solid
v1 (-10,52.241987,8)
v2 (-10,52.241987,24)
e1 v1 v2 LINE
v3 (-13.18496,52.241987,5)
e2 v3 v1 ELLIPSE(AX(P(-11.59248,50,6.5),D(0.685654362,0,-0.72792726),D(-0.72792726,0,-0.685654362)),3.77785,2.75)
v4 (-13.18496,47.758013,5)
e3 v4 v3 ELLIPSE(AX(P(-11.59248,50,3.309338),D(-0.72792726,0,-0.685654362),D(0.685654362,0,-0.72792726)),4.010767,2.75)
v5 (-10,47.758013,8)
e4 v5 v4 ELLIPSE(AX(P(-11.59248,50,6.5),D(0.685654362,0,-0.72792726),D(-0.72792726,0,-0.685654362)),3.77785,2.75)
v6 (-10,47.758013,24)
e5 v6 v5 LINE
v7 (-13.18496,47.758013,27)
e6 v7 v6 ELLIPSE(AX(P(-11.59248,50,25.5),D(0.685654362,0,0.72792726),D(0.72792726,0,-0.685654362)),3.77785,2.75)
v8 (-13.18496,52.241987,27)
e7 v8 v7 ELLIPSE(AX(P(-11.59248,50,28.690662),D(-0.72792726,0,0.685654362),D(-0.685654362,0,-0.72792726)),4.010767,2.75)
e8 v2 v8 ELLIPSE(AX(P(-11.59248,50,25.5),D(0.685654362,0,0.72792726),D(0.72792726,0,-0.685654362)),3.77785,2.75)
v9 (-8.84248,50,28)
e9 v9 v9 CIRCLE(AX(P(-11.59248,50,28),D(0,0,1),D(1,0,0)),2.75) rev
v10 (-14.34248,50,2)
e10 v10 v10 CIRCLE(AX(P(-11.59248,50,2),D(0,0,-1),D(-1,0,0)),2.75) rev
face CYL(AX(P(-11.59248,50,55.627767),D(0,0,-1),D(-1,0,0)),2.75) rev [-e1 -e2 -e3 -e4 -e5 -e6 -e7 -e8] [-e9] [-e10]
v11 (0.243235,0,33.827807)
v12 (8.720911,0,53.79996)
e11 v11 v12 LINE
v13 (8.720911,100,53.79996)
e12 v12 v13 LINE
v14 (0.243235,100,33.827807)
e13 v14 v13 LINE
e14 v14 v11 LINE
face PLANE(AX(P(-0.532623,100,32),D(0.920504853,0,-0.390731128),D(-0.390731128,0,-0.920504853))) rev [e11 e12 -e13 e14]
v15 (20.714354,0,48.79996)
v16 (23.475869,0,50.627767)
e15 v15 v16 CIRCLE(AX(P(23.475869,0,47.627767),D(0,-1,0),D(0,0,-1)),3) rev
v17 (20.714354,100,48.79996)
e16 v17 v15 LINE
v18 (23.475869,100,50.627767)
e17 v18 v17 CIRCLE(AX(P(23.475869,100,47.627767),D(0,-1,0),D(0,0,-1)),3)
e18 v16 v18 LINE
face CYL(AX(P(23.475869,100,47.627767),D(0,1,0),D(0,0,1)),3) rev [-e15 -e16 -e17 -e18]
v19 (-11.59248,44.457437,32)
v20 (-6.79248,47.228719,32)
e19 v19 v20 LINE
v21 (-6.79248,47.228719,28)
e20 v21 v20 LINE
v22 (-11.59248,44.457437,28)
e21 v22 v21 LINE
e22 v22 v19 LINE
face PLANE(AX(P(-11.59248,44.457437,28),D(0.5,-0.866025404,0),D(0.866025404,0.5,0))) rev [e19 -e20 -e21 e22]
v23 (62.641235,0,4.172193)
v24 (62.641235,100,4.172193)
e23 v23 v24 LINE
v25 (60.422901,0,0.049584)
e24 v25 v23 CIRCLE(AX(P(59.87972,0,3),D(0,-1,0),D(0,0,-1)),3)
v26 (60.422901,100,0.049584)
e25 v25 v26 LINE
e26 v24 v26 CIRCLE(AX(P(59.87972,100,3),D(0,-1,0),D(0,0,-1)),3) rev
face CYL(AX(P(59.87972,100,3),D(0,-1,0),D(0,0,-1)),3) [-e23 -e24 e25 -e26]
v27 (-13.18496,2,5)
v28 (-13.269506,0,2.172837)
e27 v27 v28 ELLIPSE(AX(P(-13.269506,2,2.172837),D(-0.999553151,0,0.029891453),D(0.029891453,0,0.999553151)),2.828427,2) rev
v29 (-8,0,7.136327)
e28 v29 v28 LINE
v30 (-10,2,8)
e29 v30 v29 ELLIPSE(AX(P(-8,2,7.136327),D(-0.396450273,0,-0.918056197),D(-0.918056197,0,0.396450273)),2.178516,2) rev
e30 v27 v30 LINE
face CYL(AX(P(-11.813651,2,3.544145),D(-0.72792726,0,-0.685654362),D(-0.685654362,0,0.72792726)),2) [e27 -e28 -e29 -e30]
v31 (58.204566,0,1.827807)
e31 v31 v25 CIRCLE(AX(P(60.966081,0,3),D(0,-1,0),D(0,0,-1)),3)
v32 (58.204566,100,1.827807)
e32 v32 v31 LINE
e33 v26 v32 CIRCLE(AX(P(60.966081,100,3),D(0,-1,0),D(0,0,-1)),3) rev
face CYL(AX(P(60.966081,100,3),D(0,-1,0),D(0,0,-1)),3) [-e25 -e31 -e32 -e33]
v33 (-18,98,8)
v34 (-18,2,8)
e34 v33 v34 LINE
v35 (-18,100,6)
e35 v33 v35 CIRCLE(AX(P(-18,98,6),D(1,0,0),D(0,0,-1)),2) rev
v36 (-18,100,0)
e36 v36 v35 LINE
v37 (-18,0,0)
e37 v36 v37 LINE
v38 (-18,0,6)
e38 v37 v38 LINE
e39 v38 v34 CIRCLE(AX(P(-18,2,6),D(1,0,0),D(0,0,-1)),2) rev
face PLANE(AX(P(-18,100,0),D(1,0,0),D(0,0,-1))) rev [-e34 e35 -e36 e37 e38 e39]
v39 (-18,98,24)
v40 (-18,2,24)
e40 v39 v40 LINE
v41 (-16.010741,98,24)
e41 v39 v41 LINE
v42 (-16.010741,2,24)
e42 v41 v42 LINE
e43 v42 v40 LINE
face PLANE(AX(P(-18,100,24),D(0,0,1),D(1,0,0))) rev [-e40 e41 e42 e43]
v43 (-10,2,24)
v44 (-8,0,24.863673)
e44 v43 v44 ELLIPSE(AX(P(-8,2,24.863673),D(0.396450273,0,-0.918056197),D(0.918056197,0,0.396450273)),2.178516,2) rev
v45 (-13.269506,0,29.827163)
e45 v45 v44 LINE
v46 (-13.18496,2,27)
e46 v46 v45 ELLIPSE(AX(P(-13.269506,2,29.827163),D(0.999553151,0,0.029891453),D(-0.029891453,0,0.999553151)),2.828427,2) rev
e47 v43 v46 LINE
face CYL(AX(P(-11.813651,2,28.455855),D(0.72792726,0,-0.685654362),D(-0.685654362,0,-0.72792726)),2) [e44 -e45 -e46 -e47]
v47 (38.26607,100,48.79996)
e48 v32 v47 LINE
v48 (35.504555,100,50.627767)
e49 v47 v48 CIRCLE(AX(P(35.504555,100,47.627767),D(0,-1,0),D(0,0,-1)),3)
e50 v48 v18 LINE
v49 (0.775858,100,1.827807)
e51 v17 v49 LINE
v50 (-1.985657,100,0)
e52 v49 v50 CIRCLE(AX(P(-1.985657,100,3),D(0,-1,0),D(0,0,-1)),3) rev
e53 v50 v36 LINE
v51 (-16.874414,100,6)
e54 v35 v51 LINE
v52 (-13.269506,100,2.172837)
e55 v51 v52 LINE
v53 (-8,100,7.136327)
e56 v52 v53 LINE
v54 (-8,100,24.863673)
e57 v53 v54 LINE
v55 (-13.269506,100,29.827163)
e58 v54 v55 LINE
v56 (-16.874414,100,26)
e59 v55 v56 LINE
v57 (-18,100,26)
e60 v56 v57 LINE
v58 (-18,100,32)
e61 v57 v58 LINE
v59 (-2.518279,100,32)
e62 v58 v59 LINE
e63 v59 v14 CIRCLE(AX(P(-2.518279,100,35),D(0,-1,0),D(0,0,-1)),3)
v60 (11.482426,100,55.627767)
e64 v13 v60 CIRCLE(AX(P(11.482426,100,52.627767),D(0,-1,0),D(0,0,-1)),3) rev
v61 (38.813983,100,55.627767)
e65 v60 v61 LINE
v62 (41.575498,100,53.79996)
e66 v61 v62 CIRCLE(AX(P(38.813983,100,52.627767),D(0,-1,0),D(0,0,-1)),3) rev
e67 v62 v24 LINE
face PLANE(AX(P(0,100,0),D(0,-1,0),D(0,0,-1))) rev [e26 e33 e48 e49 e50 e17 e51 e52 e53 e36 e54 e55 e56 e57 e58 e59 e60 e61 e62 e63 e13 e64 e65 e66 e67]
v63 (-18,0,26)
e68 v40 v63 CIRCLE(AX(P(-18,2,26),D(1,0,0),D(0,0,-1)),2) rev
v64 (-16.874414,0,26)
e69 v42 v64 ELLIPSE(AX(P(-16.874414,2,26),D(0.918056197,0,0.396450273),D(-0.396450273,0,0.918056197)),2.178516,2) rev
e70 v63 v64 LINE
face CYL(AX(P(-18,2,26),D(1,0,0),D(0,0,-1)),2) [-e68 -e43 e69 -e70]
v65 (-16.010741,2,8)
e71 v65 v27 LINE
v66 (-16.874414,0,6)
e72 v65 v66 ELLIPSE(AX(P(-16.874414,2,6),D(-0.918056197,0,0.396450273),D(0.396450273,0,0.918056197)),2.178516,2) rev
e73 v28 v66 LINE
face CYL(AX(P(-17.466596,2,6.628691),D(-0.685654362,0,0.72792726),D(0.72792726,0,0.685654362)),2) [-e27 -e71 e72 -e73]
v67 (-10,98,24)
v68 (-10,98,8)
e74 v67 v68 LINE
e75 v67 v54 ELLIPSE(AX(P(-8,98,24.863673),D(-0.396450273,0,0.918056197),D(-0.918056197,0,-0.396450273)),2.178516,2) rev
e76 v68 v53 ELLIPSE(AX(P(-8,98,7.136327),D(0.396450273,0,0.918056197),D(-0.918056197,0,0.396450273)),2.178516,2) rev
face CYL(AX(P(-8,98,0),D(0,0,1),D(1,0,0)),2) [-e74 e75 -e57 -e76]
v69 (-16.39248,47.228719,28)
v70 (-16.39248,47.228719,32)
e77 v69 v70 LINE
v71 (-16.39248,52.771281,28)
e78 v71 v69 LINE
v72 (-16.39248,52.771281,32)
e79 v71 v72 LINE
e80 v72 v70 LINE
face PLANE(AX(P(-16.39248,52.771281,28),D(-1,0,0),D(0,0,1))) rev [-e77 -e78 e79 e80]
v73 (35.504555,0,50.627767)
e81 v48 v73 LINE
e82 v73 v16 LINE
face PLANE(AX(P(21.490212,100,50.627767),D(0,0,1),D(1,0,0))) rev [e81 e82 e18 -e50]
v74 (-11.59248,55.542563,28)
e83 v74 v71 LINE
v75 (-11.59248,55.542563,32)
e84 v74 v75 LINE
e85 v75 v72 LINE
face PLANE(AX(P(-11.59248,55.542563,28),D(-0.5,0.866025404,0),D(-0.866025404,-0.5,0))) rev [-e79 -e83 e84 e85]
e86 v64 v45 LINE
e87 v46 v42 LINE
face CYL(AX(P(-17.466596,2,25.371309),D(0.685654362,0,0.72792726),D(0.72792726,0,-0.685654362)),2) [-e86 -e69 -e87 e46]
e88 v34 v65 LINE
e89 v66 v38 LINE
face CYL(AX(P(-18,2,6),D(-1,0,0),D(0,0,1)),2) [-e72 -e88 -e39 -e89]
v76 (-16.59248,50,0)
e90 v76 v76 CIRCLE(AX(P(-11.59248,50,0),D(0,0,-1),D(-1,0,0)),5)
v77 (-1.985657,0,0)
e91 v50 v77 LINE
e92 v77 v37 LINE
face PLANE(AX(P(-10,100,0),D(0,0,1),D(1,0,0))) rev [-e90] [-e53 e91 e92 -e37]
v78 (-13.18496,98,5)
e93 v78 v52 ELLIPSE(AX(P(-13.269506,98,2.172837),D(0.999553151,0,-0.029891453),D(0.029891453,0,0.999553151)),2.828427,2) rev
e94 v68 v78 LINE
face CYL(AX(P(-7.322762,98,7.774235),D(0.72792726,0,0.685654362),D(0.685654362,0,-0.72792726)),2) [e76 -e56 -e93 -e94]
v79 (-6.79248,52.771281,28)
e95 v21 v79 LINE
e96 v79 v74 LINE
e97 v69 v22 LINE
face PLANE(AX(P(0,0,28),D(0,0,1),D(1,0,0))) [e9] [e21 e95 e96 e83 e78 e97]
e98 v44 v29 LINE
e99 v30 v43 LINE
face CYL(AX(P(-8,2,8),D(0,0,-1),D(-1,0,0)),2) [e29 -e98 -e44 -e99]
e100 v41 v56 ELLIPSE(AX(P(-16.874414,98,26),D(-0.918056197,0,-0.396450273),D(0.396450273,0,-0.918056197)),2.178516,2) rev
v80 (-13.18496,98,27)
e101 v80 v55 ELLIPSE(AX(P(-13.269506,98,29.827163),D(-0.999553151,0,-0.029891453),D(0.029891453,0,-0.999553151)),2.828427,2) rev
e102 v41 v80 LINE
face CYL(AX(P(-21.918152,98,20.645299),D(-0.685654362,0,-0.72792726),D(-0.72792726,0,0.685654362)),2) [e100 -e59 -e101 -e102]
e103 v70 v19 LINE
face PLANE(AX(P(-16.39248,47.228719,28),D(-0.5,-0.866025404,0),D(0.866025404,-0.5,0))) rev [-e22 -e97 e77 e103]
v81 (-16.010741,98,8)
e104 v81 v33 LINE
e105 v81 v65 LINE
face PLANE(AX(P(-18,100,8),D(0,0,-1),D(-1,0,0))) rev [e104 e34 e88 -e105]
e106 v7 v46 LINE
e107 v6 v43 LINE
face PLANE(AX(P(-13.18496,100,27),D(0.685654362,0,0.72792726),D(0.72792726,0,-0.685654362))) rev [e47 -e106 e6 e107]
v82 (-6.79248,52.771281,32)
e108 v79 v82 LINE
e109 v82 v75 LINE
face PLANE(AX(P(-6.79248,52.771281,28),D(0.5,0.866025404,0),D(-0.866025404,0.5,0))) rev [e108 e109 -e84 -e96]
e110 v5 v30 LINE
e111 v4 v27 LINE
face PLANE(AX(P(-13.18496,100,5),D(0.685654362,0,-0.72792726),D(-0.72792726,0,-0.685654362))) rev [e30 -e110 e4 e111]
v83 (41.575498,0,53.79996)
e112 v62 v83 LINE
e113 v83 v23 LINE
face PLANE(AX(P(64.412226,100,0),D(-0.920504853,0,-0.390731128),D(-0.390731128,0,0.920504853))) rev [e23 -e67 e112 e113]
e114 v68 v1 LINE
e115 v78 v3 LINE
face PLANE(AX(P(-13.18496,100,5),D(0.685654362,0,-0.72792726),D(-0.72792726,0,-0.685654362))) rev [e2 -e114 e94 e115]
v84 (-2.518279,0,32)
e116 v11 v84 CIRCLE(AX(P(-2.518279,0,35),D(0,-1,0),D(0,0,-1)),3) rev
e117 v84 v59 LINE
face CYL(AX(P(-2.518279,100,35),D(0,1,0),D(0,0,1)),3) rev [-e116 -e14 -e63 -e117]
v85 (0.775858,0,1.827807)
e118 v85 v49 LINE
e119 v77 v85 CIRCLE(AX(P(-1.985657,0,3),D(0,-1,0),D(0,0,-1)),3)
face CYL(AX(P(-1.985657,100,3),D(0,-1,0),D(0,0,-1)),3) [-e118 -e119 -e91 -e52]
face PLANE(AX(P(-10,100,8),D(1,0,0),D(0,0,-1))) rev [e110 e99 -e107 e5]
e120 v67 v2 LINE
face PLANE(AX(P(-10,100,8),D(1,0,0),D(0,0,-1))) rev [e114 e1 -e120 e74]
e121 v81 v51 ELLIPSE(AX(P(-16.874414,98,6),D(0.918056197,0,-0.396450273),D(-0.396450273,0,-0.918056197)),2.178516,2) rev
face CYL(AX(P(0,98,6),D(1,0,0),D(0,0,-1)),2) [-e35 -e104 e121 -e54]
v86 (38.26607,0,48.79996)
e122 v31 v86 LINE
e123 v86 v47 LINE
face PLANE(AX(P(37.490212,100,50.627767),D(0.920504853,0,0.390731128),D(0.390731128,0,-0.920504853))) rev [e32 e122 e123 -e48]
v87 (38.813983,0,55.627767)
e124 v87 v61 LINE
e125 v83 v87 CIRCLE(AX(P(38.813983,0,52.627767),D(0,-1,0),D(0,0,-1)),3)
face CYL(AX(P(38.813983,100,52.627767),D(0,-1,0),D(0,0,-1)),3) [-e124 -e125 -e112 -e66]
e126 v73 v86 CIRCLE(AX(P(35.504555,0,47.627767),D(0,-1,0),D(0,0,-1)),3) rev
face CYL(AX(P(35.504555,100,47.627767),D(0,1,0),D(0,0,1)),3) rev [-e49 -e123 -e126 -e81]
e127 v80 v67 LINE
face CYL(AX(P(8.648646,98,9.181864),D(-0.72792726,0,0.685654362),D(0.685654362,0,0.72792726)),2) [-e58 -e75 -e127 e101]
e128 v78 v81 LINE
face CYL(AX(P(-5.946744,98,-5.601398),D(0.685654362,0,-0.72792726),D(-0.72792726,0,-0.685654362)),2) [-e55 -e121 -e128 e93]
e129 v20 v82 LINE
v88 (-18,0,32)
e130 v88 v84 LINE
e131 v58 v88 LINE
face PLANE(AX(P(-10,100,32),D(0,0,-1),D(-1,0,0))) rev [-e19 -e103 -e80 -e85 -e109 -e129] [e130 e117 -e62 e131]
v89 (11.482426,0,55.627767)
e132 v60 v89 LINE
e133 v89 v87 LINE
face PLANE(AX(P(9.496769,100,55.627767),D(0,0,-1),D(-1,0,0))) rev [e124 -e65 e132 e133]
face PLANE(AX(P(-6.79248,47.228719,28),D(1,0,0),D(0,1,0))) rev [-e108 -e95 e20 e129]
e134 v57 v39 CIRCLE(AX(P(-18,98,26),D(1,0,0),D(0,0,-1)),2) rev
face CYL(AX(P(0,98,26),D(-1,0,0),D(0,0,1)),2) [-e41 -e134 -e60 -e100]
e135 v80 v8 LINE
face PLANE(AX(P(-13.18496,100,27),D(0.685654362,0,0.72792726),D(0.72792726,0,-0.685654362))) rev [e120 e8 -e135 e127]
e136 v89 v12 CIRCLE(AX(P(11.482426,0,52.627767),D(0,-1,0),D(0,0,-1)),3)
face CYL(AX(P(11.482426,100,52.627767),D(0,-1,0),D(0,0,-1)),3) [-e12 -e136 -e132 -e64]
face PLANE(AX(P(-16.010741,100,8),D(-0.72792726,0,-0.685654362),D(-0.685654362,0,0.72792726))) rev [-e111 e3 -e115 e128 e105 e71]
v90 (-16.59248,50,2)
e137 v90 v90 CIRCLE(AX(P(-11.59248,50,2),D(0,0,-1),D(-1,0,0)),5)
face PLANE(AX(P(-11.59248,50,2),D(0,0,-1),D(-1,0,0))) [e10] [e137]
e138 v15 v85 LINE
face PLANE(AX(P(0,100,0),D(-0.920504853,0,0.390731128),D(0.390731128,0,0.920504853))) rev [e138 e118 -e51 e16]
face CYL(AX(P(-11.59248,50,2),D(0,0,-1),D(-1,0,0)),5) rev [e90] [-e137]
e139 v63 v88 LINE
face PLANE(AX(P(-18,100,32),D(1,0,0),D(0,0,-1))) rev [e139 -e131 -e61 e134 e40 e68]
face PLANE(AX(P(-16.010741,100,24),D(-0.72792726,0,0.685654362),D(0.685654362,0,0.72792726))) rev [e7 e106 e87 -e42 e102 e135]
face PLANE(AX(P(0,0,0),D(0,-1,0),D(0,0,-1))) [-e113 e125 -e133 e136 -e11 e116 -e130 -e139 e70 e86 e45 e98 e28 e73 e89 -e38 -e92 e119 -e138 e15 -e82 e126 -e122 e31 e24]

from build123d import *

# Parameters (mm, degrees)
BOSS_EXTRUDE1_DEPTH = 100
SKETCH2_R           = 2.75
CUT_EXTRUDE1_DEPTH  = 132.314063663
SKETCH3_R           = 5
CUT_EXTRUDE2_DEPTH  = 2
CUT_EXTRUDE3_DEPTH  = 4
FILLET3_R           = 3
FILLET6_R           = 2


with BuildPart() as part:
    # Sketch1 → Boss-Extrude1 (new body)
    with BuildSketch(Plane(origin=(0, 0, 0), x_dir=(1, 0, 0), z_dir=(0, 1, 0))):
        Polygon((-16.010741182, -8), (-13.18496009, -5), (-10, -8), (-10, -24), (-13.18496009, -27), (-16.010741182, -24), (-18, -24), (-18, -32), (-10, -32), (-0.5326227, -32), (9.496769329, -55.62776694), (40.799639873, -55.62776694), (64.412226021, 0), (58.980424134, 0), (37.490212067, -50.62776694), (21.490212067, -50.62776694), (0, 0), (-10, 0), (-18, 0), (-18, -8), align=None)
    extrude(amount=BOSS_EXTRUDE1_DEPTH)

    # Sketch2 → Cut-Extrude1 (cut, through all)
    with BuildSketch(Plane(origin=(0, 0, 0), x_dir=(-1, 0, 0), z_dir=(0, 0, -1))):
        with Locations((11.592480045, 50)):
            Circle(SKETCH2_R)
    extrude(amount=-CUT_EXTRUDE1_DEPTH, mode=Mode.SUBTRACT)

    # Sketch3 → Cut-Extrude2 (cut)
    with BuildSketch(Plane(origin=(0, 0, 0), x_dir=(-1, 0, 0), z_dir=(0, 0, -1))):
        with Locations((11.592480045, 50)):
            Circle(SKETCH3_R)
    extrude(amount=-CUT_EXTRUDE2_DEPTH, mode=Mode.SUBTRACT)

    # Sketch4 → Cut-Extrude3 (cut)
    with BuildSketch(Plane.XY.offset(32)):
        Polygon((-6.792480045, 47.228718708), (-6.792480045, 52.771281292), (-11.592480045, 55.542562584), (-16.392480045, 52.771281292), (-16.392480045, 47.228718708), (-11.592480045, 44.457437416), align=None)
    extrude(amount=-CUT_EXTRUDE3_DEPTH, mode=Mode.SUBTRACT)

    # Fillet3
    # the kernel refuses this fillet: 3 mm, written as the material it adds along each edge
    with BuildSketch(Plane(origin=(21.490212067, 0, 50.62776694), x_dir=(1, 0, 0), z_dir=(0, 1, 0)), Plane(origin=(37.490212067, 0, 50.62776694), x_dir=(0.39073112848927616, 0, -0.9205048534524394), z_dir=(0, 1, 0)), Plane(origin=(-0.5326227, 0, 32), x_dir=(-1, 0, 0), z_dir=(0, 1, 0))) as fillet3_piece_1:
        with BuildLine():
            CenterArc((FILLET3_R * 0.661885561196, FILLET3_R), FILLET3_R, 203, 67)
            Line((-FILLET3_R * 0.258619292257, FILLET3_R * 0.609268871511), (0, 0))
            Line((0, 0), (FILLET3_R * 0.661885561196, 0))
        make_face()
    extrude(amount=100)
    # the kernel refuses this fillet: 3 mm, written as the material it takes off along each edge
    with BuildSketch(Plane(origin=(0, -4.964141709, 0), x_dir=(0.39073112848927805, 0, 0.9205048534524385), z_dir=(0, 1, 0)), Plane(origin=(58.980424134, -4.964141709, 0), x_dir=(1, 0, 0), z_dir=(0, 1, 0)), Plane(origin=(40.799639873, -4.964141709, 55.62776694), x_dir=(-1, 0, 0), z_dir=(0, 1, 0)), Plane(origin=(9.496769329, -4.964141709, 55.62776694), x_dir=(-0.3907311284892769, 0, -0.920504853452439), z_dir=(0, 1, 0))) as fillet3_2_piece_1:
        with BuildLine():
            CenterArc((FILLET3_R * 0.661885561196, -FILLET3_R), FILLET3_R, 90, 67)
            Line((-FILLET3_R * 0.258619292257, -FILLET3_R * 0.609268871511), (0, 0))
            Line((0, 0), (FILLET3_R * 0.661885561196, 0))
        make_face()
    extrude(amount=109.928283418, mode=Mode.SUBTRACT)
    with BuildSketch(Plane(origin=(64.412226021, -11.331263952, 0), x_dir=(-0.3907311284892779, 0, 0.9205048534524386), z_dir=(0, 1, 0))) as fillet3_2_piece_2:
        with BuildLine():
            CenterArc((FILLET3_R * 1.51083519361, -FILLET3_R), FILLET3_R, 90, 113)
            Line((FILLET3_R * 0.590330340162, -FILLET3_R * 1.39073112849), (0, 0))
            Line((0, 0), (FILLET3_R * 1.51083519361, 0))
        make_face()
    extrude(amount=122.662527904, mode=Mode.SUBTRACT)

    # Fillet6
    fillet6_edges = [part.edges().sort_by_distance(p)[0] for p in [
        (-11.592480045, 100, 6.5),
        (-10, 100, 16),
        (-11.592480045, 100, 25.5),
        (-14.597850636, 100, 25.5),
        (-17.005370591, 100, 24),
        (-17.005370591, 0, 24),
        (-14.597850636, 0, 25.5),
        (-11.592480045, 0, 25.5),
        (-10, 0, 16),
        (-11.592480045, 0, 6.5),
        (-14.597850636, 0, 6.5),
        (-17.005370591, 0, 8),
        (-17.005370591, 100, 8),
        (-14.597850636, 100, 6.5),
    ]]
    fillet(fillet6_edges, radius=FILLET6_R)


solid = part.part
